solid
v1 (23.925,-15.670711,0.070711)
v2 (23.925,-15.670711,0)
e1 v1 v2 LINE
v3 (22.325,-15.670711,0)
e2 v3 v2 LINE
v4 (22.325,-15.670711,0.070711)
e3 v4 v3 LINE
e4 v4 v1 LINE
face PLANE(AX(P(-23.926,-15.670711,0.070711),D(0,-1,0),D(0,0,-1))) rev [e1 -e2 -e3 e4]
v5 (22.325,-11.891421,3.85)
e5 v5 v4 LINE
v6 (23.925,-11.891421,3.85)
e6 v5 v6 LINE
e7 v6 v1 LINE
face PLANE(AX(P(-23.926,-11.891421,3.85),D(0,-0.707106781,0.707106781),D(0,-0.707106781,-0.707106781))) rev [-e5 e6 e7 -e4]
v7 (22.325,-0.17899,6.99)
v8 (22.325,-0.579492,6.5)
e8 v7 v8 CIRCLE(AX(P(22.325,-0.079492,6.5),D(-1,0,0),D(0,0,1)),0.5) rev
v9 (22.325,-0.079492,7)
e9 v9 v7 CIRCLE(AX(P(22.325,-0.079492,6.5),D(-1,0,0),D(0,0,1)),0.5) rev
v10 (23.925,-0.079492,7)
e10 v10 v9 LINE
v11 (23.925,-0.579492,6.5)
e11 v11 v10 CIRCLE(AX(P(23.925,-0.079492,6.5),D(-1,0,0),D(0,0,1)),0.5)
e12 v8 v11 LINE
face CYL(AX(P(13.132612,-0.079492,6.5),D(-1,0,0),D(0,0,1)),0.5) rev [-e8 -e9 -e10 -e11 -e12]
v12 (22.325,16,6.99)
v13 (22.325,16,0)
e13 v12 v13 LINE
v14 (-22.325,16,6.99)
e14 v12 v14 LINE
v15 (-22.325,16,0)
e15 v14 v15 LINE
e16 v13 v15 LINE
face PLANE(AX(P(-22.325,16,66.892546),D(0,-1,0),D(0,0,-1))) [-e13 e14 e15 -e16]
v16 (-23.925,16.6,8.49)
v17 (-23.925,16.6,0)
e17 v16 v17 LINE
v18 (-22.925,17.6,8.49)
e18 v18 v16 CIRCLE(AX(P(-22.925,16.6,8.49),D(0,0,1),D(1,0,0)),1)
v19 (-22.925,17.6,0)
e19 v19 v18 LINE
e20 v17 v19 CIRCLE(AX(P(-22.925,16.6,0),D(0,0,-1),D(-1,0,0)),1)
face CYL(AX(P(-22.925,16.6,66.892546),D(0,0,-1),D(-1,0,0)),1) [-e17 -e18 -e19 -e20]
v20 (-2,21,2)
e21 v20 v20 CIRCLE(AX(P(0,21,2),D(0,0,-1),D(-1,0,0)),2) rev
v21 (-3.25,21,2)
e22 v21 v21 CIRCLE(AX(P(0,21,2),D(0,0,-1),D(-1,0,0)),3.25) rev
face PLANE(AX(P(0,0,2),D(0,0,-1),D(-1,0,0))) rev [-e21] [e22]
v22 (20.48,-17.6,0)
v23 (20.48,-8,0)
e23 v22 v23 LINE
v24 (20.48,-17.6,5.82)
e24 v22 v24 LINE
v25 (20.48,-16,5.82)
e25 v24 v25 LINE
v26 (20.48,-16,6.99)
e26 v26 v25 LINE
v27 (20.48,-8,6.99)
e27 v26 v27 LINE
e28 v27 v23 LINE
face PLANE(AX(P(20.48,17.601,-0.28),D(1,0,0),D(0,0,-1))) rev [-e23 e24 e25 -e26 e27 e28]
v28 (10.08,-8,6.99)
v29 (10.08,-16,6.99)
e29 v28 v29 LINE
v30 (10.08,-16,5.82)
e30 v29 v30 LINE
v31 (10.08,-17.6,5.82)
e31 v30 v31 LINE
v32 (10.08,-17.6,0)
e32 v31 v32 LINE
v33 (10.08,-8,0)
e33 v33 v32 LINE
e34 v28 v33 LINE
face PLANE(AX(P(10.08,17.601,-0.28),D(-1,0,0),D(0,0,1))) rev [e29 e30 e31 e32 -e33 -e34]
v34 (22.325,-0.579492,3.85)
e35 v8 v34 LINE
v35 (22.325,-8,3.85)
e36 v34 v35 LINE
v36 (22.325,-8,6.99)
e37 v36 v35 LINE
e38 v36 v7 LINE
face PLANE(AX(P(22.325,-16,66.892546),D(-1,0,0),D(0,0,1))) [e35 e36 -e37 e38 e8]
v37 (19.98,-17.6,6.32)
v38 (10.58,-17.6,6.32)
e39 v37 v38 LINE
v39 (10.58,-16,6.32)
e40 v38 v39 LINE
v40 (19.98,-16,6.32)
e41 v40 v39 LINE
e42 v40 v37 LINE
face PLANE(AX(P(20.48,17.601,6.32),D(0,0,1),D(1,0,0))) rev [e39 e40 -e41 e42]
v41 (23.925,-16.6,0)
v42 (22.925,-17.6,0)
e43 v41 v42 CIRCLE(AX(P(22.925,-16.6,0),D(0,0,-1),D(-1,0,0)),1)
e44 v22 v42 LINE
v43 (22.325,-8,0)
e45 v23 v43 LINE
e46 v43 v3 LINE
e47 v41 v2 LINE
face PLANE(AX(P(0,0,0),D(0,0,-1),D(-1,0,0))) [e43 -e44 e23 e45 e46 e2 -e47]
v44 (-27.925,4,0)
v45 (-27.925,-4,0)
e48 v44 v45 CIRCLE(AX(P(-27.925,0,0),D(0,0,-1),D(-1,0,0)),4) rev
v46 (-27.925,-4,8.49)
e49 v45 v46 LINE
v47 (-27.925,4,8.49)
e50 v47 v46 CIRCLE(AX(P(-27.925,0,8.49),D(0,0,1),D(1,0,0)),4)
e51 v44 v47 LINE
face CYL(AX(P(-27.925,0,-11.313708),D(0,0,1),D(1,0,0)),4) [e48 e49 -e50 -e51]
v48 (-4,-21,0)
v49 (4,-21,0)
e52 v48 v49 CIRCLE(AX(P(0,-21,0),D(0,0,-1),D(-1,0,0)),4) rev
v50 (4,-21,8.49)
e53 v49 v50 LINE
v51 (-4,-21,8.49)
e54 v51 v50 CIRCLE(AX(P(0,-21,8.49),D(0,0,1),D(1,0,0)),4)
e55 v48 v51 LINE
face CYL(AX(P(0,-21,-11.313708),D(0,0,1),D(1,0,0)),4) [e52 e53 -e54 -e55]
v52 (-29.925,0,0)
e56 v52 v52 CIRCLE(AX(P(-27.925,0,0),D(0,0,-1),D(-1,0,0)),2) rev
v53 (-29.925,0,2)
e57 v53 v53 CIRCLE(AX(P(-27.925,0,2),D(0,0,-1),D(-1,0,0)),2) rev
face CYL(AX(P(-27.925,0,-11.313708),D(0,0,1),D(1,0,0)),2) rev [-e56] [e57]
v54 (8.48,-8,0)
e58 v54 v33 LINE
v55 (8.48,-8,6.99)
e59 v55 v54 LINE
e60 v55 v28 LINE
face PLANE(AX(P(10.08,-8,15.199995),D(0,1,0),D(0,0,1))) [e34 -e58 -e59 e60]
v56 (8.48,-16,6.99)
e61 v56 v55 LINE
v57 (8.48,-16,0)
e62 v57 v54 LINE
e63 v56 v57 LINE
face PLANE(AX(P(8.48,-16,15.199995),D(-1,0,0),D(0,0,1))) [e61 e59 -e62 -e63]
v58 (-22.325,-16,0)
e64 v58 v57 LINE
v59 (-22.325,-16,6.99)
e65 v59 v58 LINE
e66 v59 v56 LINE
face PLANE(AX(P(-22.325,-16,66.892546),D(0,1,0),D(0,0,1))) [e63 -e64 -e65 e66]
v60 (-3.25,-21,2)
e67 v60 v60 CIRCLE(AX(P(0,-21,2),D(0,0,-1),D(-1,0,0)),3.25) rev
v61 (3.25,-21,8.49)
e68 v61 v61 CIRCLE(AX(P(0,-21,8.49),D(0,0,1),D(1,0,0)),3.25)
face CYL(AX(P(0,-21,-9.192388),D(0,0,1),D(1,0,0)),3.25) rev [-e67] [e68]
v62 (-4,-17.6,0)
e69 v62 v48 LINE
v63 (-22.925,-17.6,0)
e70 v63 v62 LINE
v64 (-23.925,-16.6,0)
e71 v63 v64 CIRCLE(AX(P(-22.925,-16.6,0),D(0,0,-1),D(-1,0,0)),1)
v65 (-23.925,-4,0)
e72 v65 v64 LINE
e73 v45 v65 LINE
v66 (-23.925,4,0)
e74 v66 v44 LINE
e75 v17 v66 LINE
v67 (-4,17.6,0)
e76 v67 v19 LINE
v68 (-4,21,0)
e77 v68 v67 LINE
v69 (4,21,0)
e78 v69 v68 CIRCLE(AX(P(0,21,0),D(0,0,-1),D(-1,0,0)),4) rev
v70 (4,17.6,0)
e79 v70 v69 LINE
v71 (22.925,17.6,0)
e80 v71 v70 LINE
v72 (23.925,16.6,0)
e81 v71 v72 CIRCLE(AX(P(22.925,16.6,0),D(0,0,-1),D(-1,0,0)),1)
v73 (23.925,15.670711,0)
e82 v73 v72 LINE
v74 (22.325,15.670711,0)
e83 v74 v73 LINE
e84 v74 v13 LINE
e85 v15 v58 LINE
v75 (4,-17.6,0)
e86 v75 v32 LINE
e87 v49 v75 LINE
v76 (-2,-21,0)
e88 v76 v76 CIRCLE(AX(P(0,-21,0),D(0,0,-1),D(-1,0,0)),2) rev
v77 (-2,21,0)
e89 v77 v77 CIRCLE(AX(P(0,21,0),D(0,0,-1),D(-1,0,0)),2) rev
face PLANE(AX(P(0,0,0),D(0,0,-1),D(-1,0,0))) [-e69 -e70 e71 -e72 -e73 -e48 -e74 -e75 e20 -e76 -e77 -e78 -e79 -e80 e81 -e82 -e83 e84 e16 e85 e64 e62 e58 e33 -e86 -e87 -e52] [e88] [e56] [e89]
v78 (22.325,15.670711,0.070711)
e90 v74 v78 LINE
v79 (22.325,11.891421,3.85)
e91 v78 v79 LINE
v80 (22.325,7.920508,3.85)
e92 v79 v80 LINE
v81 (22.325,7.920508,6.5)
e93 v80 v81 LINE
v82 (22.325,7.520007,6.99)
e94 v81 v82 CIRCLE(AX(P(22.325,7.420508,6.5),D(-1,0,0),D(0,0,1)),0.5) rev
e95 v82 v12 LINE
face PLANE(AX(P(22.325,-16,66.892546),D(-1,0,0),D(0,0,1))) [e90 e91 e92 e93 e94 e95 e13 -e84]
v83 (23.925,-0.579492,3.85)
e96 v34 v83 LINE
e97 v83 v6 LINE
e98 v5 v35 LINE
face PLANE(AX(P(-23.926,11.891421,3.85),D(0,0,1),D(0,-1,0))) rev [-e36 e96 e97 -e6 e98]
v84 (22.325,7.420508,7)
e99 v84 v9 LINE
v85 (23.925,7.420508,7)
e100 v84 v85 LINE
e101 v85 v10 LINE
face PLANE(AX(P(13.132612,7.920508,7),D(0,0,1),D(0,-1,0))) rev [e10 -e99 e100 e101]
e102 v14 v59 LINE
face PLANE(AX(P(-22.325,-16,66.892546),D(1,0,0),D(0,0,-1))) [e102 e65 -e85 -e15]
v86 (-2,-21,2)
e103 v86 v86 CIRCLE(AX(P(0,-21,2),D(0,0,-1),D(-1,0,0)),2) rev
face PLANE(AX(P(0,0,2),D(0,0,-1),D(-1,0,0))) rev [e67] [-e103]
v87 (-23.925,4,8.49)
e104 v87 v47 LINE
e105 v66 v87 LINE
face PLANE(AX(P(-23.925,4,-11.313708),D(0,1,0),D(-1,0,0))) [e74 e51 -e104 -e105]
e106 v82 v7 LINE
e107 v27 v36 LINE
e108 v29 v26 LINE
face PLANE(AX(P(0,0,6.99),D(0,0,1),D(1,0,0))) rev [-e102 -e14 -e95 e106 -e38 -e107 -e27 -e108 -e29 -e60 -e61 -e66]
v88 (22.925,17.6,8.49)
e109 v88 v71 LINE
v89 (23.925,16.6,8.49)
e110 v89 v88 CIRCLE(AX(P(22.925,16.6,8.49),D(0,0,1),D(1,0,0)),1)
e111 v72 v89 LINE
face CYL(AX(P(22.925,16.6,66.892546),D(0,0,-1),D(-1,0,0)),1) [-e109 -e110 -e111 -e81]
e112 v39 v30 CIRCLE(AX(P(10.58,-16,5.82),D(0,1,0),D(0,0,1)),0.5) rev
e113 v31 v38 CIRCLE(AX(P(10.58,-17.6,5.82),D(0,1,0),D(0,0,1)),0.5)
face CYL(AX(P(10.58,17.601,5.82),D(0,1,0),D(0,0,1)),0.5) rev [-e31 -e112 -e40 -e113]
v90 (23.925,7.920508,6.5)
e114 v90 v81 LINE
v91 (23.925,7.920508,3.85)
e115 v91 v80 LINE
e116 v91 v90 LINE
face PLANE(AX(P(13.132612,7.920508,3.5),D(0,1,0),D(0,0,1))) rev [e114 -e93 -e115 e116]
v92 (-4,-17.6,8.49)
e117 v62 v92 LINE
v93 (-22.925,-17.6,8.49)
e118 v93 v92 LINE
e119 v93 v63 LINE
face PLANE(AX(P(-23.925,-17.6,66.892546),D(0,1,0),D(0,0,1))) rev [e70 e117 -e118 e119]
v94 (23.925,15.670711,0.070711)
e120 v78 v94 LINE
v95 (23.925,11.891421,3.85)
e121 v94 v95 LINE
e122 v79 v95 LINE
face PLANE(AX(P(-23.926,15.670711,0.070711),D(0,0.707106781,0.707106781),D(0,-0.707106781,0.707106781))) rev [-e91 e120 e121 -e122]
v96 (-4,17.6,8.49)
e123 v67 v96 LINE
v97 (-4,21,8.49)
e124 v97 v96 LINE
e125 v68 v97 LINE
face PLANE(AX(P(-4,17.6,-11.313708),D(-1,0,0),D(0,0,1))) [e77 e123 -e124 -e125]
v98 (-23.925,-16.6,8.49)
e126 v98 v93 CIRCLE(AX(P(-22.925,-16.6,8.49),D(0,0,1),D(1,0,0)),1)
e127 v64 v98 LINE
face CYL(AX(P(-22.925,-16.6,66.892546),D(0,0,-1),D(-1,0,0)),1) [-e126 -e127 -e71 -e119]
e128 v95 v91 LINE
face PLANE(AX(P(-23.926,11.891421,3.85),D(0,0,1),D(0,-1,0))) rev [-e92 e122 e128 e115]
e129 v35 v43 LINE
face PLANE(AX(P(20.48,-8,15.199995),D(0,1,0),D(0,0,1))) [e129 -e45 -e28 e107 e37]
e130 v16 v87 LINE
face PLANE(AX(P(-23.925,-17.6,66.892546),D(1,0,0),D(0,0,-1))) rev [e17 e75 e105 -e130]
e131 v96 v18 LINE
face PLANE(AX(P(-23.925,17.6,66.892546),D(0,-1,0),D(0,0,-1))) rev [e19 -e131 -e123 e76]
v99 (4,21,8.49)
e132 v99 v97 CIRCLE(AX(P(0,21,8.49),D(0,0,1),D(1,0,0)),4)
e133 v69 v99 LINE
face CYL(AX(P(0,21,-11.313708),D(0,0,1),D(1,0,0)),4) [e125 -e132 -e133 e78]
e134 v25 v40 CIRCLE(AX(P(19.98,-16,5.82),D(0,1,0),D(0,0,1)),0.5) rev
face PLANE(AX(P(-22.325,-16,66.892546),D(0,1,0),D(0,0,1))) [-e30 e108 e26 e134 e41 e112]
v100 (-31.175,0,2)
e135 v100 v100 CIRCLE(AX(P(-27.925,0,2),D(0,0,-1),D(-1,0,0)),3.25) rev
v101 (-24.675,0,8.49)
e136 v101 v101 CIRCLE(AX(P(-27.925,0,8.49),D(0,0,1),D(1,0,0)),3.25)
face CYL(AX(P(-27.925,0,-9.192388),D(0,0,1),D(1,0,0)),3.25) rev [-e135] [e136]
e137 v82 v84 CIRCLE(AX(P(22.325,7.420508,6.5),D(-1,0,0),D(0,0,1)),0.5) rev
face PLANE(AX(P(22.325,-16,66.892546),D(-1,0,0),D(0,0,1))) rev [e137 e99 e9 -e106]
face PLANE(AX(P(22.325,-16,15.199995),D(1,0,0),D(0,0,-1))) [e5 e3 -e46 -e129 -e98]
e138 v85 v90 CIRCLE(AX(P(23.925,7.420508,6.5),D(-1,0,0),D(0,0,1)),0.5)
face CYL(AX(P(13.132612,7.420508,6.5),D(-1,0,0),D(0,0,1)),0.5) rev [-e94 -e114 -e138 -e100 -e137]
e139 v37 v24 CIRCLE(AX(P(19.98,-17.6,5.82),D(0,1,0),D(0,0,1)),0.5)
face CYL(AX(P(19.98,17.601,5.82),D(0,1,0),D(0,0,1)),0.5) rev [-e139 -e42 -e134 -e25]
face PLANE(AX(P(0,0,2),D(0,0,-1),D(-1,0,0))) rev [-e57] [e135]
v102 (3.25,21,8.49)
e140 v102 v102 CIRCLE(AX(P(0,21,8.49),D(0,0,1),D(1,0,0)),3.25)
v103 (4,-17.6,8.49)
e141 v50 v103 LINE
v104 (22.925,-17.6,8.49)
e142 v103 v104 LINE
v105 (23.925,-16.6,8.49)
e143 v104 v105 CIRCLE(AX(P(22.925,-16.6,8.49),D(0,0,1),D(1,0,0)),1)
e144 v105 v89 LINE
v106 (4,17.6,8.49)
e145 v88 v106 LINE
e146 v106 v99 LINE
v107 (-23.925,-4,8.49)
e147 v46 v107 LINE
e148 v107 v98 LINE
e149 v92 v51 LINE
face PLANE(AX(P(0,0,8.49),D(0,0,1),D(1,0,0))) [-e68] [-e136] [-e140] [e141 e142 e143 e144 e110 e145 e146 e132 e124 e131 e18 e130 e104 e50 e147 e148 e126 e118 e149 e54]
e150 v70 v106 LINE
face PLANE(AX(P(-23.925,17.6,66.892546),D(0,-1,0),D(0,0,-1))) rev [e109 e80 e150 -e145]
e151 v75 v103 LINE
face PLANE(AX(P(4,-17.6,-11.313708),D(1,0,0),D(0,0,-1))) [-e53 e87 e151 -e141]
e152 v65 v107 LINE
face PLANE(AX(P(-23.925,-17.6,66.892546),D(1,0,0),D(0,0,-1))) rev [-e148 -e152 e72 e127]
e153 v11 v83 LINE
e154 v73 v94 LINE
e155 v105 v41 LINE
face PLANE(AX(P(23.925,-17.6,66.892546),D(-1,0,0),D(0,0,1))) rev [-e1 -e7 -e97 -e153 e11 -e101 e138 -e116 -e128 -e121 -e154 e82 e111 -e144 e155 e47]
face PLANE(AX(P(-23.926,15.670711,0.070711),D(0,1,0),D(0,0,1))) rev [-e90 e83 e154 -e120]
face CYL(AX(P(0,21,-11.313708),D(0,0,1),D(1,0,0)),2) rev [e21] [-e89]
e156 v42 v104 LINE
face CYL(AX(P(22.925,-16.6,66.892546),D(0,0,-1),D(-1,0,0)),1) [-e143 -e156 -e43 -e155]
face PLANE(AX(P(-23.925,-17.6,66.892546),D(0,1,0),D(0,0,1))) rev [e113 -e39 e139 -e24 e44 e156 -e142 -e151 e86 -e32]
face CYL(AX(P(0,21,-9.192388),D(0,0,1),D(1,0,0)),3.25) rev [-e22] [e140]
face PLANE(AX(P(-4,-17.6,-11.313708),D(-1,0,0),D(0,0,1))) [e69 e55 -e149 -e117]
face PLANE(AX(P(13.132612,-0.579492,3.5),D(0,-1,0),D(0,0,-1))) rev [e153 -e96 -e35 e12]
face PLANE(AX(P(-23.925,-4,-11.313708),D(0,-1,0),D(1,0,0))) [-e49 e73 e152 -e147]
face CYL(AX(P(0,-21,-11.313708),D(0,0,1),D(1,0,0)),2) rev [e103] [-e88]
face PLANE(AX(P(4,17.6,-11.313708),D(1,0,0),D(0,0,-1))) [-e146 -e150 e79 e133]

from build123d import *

# Parameters (mm, degrees)
SKETCH1_W           = 47.85
SKETCH1_H           = 35.2
SKETCH1_W_2         = 44.65
SKETCH1_H_2         = 32
BOSS_EXTRUDE1_DEPTH = 6.99
SKETCH2_W           = 47.85
SKETCH2_H           = 35.2
BOSS_EXTRUDE2_DEPTH = 1.5
CUT_EXTRUDE1_REACH  = 53.686
SKETCH4_W           = 3.5
SKETCH4_H           = 8.5
CUT_EXTRUDE2_DEPTH  = 1.6
CUT_EXTRUDE3_REACH  = 45.4
SKETCH6_W           = 10.4
SKETCH6_H           = 6.6
FILLET1_R           = 1
FILLET2_R           = 0.5
SKETCH7_R           = 2
BOSS_EXTRUDE3_DEPTH = 8.49
SKETCH8_R           = 3.25
CUT_EXTRUDE4_DEPTH  = 6.49
BOSS_EXTRUDE4_REACH = 43.428
SKETCH9_W           = 1.6
SKETCH9_H           = 8
SKETCH9_W_2         = 1.845


with BuildPart() as part:
    # Sketch1 → Boss-Extrude1 (new body)
    with BuildSketch(Plane.XY):
        Rectangle(SKETCH1_W, SKETCH1_H)
        Rectangle(SKETCH1_W_2, SKETCH1_H_2, mode=Mode.SUBTRACT)
    extrude(amount=BOSS_EXTRUDE1_DEPTH)

    # Sketch2 → Boss-Extrude2 (add)
    with BuildSketch(Plane.XY.offset(6.99)):
        Rectangle(SKETCH2_W, SKETCH2_H)
    extrude(amount=BOSS_EXTRUDE2_DEPTH)

    # Sketch3 → Cut-Extrude1 (cut, up to next)
    with BuildSketch(Plane(origin=(23.925, 0, 0), x_dir=(0, 0, -1), z_dir=(1, 0, 0)), mode=Mode.PRIVATE) as cut_extrude1_sk1:
        Polygon((-0.070710678, 15.670710678), (0, 15.670710678), (0, -15.670710678), (-0.070710678, -15.670710678), (-3.85, -11.891421356), (-3.85, 11.891421356), align=None)
    cut_extrude1_tool1 = extrude(cut_extrude1_sk1.sketch, amount=-CUT_EXTRUDE1_REACH, mode=Mode.PRIVATE) & part.part
    add(cut_extrude1_tool1.solids().sort_by_distance((23.925, 0, 1.835684))[0], mode=Mode.SUBTRACT)

    # Sketch4 → Cut-Extrude2 (cut)
    with BuildSketch(Plane(origin=(23.925, 0, 0), x_dir=(0, 0, -1), z_dir=(1, 0, 0))):
        with Locations((-5.25, 3.670508357)):
            Rectangle(SKETCH4_W, SKETCH4_H)
    extrude(amount=-CUT_EXTRUDE2_DEPTH, mode=Mode.SUBTRACT)

    # Sketch6 → Cut-Extrude3 (cut, up to next)
    with BuildSketch(Plane.XZ.offset(17.6), mode=Mode.PRIVATE) as cut_extrude3_sk1:
        with Locations((15.28, 3.02)):
            Rectangle(SKETCH6_W, SKETCH6_H)
    cut_extrude3_tool1 = extrude(cut_extrude3_sk1.sketch, amount=-CUT_EXTRUDE3_REACH, mode=Mode.PRIVATE) & part.part
    add(cut_extrude3_tool1.solids().sort_by_distance((15.28, -17.6, 3.02))[0], mode=Mode.SUBTRACT)

    # Fillet1
    fillet1_edges = [part.edges().sort_by_distance(p)[0] for p in [
        (-23.925, 17.6, 4.245),
        (23.925, 17.6, 4.245),
        (23.925, -17.6, 4.245),
        (-23.925, -17.6, 4.245),
    ]]
    fillet(fillet1_edges, radius=FILLET1_R)

    # Fillet2
    # the kernel refuses this fillet: 0.5 mm, written as the material it adds along each edge
    with BuildSketch(Plane(origin=(20.48, -17.6, 6.32), x_dir=(-1, 0, 0), z_dir=(0, 1, 0)), Plane(origin=(10.08, -17.6, 6.32), x_dir=(0, 0, -1), z_dir=(0, 1, 0)), Plane(origin=(23.925, 7.920508357, 7), x_dir=(0, -1, 0), z_dir=(-1, 0, 0)), Plane(origin=(23.925, -0.579491643, 7), x_dir=(0, 0, -1), z_dir=(-1, 0, 0))) as fillet2_piece_1:
        with BuildLine():
            CenterArc((FILLET2_R, -FILLET2_R), FILLET2_R, 90, 90)
            Line((0, -FILLET2_R), (0, 0))
            Line((0, 0), (FILLET2_R, 0))
        make_face()
    extrude(amount=1.6)

    # Sketch7 → Boss-Extrude3 (add)
    # profile 1 of 3: a face of its own
    with BuildSketch(Plane.XY.offset(8.49)):
        with BuildLine():
            Line((4, -17.6), (4, -21))
            ThreePointArc((4, -21), (0, -25), (-4, -21))
            Line((-4, -21), (-4, -17.6))
            Line((-4, -17.6), (4, -17.6))
        make_face()
        with Locations((0, -21)):
            Circle(SKETCH7_R, mode=Mode.SUBTRACT)
    # profile 2 of 3: a face of its own
    with BuildSketch(Plane.XY.offset(8.49)):
        with BuildLine():
            Line((-4, 17.6), (-4, 21))
            ThreePointArc((-4, 21), (0, 25), (4, 21))
            Line((4, 21), (4, 17.6))
            Line((4, 17.6), (-4, 17.6))
        make_face()
        with Locations((0, 21)):
            Circle(SKETCH7_R, mode=Mode.SUBTRACT)
    # profile 3 of 3: a face of its own
    with BuildSketch(Plane.XY.offset(8.49)):
        with BuildLine():
            Line((-23.925, -4), (-27.925, -4))
            ThreePointArc((-27.925, -4), (-31.925, 0), (-27.925, 4))
            Line((-27.925, 4), (-23.925, 4))
            Line((-23.925, 4), (-23.925, -4))
        make_face()
        with Locations((-27.925, 0)):
            Circle(SKETCH7_R, mode=Mode.SUBTRACT)
    extrude(amount=-BOSS_EXTRUDE3_DEPTH)

    # Sketch8 → Cut-Extrude4 (cut)
    with BuildSketch(Plane.XY.offset(8.49)):
        with Locations((0, 21)):
            Circle(SKETCH8_R)
        with Locations((0, -21)):
            Circle(SKETCH8_R)
        with Locations((-27.925, 0)):
            Circle(SKETCH8_R)
    extrude(amount=-CUT_EXTRUDE4_DEPTH, mode=Mode.SUBTRACT)

    # Boss-Extrude4: up to this face of the body (flat: up to its plane)
    boss_extrude4_end = Plane(part.part.faces().sort_by_distance((0, 0, 6.99))[0])
    # Sketch9 → Boss-Extrude4 (add, up to the picked face)
    with BuildSketch(Plane(origin=(0, 0, 0), x_dir=(-1, 0, 0), z_dir=(0, 0, -1)), mode=Mode.PRIVATE) as boss_extrude4_sk1:
        with Locations((-9.28, -12)):
            Rectangle(SKETCH9_W, SKETCH9_H)
    boss_extrude4_tool1 = split(extrude(boss_extrude4_sk1.sketch, amount=-BOSS_EXTRUDE4_REACH, mode=Mode.PRIVATE), bisect_by=boss_extrude4_end, keep=Keep.BOTH, mode=Mode.PRIVATE)
    # Sketch9 → Boss-Extrude4 (add, up to the picked face)
    with BuildSketch(Plane(origin=(0, 0, 0), x_dir=(-1, 0, 0), z_dir=(0, 0, -1)), mode=Mode.PRIVATE) as boss_extrude4_sk2:
        with Locations((-21.4025, -12)):
            Rectangle(SKETCH9_W_2, SKETCH9_H)
    boss_extrude4_tool2 = split(extrude(boss_extrude4_sk2.sketch, amount=-BOSS_EXTRUDE4_REACH, mode=Mode.PRIVATE), bisect_by=boss_extrude4_end, keep=Keep.BOTH, mode=Mode.PRIVATE)
    add(boss_extrude4_tool1.solids().sort_by(Axis((9.28, -12, 0), (0, 0, 1)))[0])
    add(boss_extrude4_tool2.solids().sort_by(Axis((21.4025, -12, 0), (0, 0, 1)))[0])


solid = part.part
